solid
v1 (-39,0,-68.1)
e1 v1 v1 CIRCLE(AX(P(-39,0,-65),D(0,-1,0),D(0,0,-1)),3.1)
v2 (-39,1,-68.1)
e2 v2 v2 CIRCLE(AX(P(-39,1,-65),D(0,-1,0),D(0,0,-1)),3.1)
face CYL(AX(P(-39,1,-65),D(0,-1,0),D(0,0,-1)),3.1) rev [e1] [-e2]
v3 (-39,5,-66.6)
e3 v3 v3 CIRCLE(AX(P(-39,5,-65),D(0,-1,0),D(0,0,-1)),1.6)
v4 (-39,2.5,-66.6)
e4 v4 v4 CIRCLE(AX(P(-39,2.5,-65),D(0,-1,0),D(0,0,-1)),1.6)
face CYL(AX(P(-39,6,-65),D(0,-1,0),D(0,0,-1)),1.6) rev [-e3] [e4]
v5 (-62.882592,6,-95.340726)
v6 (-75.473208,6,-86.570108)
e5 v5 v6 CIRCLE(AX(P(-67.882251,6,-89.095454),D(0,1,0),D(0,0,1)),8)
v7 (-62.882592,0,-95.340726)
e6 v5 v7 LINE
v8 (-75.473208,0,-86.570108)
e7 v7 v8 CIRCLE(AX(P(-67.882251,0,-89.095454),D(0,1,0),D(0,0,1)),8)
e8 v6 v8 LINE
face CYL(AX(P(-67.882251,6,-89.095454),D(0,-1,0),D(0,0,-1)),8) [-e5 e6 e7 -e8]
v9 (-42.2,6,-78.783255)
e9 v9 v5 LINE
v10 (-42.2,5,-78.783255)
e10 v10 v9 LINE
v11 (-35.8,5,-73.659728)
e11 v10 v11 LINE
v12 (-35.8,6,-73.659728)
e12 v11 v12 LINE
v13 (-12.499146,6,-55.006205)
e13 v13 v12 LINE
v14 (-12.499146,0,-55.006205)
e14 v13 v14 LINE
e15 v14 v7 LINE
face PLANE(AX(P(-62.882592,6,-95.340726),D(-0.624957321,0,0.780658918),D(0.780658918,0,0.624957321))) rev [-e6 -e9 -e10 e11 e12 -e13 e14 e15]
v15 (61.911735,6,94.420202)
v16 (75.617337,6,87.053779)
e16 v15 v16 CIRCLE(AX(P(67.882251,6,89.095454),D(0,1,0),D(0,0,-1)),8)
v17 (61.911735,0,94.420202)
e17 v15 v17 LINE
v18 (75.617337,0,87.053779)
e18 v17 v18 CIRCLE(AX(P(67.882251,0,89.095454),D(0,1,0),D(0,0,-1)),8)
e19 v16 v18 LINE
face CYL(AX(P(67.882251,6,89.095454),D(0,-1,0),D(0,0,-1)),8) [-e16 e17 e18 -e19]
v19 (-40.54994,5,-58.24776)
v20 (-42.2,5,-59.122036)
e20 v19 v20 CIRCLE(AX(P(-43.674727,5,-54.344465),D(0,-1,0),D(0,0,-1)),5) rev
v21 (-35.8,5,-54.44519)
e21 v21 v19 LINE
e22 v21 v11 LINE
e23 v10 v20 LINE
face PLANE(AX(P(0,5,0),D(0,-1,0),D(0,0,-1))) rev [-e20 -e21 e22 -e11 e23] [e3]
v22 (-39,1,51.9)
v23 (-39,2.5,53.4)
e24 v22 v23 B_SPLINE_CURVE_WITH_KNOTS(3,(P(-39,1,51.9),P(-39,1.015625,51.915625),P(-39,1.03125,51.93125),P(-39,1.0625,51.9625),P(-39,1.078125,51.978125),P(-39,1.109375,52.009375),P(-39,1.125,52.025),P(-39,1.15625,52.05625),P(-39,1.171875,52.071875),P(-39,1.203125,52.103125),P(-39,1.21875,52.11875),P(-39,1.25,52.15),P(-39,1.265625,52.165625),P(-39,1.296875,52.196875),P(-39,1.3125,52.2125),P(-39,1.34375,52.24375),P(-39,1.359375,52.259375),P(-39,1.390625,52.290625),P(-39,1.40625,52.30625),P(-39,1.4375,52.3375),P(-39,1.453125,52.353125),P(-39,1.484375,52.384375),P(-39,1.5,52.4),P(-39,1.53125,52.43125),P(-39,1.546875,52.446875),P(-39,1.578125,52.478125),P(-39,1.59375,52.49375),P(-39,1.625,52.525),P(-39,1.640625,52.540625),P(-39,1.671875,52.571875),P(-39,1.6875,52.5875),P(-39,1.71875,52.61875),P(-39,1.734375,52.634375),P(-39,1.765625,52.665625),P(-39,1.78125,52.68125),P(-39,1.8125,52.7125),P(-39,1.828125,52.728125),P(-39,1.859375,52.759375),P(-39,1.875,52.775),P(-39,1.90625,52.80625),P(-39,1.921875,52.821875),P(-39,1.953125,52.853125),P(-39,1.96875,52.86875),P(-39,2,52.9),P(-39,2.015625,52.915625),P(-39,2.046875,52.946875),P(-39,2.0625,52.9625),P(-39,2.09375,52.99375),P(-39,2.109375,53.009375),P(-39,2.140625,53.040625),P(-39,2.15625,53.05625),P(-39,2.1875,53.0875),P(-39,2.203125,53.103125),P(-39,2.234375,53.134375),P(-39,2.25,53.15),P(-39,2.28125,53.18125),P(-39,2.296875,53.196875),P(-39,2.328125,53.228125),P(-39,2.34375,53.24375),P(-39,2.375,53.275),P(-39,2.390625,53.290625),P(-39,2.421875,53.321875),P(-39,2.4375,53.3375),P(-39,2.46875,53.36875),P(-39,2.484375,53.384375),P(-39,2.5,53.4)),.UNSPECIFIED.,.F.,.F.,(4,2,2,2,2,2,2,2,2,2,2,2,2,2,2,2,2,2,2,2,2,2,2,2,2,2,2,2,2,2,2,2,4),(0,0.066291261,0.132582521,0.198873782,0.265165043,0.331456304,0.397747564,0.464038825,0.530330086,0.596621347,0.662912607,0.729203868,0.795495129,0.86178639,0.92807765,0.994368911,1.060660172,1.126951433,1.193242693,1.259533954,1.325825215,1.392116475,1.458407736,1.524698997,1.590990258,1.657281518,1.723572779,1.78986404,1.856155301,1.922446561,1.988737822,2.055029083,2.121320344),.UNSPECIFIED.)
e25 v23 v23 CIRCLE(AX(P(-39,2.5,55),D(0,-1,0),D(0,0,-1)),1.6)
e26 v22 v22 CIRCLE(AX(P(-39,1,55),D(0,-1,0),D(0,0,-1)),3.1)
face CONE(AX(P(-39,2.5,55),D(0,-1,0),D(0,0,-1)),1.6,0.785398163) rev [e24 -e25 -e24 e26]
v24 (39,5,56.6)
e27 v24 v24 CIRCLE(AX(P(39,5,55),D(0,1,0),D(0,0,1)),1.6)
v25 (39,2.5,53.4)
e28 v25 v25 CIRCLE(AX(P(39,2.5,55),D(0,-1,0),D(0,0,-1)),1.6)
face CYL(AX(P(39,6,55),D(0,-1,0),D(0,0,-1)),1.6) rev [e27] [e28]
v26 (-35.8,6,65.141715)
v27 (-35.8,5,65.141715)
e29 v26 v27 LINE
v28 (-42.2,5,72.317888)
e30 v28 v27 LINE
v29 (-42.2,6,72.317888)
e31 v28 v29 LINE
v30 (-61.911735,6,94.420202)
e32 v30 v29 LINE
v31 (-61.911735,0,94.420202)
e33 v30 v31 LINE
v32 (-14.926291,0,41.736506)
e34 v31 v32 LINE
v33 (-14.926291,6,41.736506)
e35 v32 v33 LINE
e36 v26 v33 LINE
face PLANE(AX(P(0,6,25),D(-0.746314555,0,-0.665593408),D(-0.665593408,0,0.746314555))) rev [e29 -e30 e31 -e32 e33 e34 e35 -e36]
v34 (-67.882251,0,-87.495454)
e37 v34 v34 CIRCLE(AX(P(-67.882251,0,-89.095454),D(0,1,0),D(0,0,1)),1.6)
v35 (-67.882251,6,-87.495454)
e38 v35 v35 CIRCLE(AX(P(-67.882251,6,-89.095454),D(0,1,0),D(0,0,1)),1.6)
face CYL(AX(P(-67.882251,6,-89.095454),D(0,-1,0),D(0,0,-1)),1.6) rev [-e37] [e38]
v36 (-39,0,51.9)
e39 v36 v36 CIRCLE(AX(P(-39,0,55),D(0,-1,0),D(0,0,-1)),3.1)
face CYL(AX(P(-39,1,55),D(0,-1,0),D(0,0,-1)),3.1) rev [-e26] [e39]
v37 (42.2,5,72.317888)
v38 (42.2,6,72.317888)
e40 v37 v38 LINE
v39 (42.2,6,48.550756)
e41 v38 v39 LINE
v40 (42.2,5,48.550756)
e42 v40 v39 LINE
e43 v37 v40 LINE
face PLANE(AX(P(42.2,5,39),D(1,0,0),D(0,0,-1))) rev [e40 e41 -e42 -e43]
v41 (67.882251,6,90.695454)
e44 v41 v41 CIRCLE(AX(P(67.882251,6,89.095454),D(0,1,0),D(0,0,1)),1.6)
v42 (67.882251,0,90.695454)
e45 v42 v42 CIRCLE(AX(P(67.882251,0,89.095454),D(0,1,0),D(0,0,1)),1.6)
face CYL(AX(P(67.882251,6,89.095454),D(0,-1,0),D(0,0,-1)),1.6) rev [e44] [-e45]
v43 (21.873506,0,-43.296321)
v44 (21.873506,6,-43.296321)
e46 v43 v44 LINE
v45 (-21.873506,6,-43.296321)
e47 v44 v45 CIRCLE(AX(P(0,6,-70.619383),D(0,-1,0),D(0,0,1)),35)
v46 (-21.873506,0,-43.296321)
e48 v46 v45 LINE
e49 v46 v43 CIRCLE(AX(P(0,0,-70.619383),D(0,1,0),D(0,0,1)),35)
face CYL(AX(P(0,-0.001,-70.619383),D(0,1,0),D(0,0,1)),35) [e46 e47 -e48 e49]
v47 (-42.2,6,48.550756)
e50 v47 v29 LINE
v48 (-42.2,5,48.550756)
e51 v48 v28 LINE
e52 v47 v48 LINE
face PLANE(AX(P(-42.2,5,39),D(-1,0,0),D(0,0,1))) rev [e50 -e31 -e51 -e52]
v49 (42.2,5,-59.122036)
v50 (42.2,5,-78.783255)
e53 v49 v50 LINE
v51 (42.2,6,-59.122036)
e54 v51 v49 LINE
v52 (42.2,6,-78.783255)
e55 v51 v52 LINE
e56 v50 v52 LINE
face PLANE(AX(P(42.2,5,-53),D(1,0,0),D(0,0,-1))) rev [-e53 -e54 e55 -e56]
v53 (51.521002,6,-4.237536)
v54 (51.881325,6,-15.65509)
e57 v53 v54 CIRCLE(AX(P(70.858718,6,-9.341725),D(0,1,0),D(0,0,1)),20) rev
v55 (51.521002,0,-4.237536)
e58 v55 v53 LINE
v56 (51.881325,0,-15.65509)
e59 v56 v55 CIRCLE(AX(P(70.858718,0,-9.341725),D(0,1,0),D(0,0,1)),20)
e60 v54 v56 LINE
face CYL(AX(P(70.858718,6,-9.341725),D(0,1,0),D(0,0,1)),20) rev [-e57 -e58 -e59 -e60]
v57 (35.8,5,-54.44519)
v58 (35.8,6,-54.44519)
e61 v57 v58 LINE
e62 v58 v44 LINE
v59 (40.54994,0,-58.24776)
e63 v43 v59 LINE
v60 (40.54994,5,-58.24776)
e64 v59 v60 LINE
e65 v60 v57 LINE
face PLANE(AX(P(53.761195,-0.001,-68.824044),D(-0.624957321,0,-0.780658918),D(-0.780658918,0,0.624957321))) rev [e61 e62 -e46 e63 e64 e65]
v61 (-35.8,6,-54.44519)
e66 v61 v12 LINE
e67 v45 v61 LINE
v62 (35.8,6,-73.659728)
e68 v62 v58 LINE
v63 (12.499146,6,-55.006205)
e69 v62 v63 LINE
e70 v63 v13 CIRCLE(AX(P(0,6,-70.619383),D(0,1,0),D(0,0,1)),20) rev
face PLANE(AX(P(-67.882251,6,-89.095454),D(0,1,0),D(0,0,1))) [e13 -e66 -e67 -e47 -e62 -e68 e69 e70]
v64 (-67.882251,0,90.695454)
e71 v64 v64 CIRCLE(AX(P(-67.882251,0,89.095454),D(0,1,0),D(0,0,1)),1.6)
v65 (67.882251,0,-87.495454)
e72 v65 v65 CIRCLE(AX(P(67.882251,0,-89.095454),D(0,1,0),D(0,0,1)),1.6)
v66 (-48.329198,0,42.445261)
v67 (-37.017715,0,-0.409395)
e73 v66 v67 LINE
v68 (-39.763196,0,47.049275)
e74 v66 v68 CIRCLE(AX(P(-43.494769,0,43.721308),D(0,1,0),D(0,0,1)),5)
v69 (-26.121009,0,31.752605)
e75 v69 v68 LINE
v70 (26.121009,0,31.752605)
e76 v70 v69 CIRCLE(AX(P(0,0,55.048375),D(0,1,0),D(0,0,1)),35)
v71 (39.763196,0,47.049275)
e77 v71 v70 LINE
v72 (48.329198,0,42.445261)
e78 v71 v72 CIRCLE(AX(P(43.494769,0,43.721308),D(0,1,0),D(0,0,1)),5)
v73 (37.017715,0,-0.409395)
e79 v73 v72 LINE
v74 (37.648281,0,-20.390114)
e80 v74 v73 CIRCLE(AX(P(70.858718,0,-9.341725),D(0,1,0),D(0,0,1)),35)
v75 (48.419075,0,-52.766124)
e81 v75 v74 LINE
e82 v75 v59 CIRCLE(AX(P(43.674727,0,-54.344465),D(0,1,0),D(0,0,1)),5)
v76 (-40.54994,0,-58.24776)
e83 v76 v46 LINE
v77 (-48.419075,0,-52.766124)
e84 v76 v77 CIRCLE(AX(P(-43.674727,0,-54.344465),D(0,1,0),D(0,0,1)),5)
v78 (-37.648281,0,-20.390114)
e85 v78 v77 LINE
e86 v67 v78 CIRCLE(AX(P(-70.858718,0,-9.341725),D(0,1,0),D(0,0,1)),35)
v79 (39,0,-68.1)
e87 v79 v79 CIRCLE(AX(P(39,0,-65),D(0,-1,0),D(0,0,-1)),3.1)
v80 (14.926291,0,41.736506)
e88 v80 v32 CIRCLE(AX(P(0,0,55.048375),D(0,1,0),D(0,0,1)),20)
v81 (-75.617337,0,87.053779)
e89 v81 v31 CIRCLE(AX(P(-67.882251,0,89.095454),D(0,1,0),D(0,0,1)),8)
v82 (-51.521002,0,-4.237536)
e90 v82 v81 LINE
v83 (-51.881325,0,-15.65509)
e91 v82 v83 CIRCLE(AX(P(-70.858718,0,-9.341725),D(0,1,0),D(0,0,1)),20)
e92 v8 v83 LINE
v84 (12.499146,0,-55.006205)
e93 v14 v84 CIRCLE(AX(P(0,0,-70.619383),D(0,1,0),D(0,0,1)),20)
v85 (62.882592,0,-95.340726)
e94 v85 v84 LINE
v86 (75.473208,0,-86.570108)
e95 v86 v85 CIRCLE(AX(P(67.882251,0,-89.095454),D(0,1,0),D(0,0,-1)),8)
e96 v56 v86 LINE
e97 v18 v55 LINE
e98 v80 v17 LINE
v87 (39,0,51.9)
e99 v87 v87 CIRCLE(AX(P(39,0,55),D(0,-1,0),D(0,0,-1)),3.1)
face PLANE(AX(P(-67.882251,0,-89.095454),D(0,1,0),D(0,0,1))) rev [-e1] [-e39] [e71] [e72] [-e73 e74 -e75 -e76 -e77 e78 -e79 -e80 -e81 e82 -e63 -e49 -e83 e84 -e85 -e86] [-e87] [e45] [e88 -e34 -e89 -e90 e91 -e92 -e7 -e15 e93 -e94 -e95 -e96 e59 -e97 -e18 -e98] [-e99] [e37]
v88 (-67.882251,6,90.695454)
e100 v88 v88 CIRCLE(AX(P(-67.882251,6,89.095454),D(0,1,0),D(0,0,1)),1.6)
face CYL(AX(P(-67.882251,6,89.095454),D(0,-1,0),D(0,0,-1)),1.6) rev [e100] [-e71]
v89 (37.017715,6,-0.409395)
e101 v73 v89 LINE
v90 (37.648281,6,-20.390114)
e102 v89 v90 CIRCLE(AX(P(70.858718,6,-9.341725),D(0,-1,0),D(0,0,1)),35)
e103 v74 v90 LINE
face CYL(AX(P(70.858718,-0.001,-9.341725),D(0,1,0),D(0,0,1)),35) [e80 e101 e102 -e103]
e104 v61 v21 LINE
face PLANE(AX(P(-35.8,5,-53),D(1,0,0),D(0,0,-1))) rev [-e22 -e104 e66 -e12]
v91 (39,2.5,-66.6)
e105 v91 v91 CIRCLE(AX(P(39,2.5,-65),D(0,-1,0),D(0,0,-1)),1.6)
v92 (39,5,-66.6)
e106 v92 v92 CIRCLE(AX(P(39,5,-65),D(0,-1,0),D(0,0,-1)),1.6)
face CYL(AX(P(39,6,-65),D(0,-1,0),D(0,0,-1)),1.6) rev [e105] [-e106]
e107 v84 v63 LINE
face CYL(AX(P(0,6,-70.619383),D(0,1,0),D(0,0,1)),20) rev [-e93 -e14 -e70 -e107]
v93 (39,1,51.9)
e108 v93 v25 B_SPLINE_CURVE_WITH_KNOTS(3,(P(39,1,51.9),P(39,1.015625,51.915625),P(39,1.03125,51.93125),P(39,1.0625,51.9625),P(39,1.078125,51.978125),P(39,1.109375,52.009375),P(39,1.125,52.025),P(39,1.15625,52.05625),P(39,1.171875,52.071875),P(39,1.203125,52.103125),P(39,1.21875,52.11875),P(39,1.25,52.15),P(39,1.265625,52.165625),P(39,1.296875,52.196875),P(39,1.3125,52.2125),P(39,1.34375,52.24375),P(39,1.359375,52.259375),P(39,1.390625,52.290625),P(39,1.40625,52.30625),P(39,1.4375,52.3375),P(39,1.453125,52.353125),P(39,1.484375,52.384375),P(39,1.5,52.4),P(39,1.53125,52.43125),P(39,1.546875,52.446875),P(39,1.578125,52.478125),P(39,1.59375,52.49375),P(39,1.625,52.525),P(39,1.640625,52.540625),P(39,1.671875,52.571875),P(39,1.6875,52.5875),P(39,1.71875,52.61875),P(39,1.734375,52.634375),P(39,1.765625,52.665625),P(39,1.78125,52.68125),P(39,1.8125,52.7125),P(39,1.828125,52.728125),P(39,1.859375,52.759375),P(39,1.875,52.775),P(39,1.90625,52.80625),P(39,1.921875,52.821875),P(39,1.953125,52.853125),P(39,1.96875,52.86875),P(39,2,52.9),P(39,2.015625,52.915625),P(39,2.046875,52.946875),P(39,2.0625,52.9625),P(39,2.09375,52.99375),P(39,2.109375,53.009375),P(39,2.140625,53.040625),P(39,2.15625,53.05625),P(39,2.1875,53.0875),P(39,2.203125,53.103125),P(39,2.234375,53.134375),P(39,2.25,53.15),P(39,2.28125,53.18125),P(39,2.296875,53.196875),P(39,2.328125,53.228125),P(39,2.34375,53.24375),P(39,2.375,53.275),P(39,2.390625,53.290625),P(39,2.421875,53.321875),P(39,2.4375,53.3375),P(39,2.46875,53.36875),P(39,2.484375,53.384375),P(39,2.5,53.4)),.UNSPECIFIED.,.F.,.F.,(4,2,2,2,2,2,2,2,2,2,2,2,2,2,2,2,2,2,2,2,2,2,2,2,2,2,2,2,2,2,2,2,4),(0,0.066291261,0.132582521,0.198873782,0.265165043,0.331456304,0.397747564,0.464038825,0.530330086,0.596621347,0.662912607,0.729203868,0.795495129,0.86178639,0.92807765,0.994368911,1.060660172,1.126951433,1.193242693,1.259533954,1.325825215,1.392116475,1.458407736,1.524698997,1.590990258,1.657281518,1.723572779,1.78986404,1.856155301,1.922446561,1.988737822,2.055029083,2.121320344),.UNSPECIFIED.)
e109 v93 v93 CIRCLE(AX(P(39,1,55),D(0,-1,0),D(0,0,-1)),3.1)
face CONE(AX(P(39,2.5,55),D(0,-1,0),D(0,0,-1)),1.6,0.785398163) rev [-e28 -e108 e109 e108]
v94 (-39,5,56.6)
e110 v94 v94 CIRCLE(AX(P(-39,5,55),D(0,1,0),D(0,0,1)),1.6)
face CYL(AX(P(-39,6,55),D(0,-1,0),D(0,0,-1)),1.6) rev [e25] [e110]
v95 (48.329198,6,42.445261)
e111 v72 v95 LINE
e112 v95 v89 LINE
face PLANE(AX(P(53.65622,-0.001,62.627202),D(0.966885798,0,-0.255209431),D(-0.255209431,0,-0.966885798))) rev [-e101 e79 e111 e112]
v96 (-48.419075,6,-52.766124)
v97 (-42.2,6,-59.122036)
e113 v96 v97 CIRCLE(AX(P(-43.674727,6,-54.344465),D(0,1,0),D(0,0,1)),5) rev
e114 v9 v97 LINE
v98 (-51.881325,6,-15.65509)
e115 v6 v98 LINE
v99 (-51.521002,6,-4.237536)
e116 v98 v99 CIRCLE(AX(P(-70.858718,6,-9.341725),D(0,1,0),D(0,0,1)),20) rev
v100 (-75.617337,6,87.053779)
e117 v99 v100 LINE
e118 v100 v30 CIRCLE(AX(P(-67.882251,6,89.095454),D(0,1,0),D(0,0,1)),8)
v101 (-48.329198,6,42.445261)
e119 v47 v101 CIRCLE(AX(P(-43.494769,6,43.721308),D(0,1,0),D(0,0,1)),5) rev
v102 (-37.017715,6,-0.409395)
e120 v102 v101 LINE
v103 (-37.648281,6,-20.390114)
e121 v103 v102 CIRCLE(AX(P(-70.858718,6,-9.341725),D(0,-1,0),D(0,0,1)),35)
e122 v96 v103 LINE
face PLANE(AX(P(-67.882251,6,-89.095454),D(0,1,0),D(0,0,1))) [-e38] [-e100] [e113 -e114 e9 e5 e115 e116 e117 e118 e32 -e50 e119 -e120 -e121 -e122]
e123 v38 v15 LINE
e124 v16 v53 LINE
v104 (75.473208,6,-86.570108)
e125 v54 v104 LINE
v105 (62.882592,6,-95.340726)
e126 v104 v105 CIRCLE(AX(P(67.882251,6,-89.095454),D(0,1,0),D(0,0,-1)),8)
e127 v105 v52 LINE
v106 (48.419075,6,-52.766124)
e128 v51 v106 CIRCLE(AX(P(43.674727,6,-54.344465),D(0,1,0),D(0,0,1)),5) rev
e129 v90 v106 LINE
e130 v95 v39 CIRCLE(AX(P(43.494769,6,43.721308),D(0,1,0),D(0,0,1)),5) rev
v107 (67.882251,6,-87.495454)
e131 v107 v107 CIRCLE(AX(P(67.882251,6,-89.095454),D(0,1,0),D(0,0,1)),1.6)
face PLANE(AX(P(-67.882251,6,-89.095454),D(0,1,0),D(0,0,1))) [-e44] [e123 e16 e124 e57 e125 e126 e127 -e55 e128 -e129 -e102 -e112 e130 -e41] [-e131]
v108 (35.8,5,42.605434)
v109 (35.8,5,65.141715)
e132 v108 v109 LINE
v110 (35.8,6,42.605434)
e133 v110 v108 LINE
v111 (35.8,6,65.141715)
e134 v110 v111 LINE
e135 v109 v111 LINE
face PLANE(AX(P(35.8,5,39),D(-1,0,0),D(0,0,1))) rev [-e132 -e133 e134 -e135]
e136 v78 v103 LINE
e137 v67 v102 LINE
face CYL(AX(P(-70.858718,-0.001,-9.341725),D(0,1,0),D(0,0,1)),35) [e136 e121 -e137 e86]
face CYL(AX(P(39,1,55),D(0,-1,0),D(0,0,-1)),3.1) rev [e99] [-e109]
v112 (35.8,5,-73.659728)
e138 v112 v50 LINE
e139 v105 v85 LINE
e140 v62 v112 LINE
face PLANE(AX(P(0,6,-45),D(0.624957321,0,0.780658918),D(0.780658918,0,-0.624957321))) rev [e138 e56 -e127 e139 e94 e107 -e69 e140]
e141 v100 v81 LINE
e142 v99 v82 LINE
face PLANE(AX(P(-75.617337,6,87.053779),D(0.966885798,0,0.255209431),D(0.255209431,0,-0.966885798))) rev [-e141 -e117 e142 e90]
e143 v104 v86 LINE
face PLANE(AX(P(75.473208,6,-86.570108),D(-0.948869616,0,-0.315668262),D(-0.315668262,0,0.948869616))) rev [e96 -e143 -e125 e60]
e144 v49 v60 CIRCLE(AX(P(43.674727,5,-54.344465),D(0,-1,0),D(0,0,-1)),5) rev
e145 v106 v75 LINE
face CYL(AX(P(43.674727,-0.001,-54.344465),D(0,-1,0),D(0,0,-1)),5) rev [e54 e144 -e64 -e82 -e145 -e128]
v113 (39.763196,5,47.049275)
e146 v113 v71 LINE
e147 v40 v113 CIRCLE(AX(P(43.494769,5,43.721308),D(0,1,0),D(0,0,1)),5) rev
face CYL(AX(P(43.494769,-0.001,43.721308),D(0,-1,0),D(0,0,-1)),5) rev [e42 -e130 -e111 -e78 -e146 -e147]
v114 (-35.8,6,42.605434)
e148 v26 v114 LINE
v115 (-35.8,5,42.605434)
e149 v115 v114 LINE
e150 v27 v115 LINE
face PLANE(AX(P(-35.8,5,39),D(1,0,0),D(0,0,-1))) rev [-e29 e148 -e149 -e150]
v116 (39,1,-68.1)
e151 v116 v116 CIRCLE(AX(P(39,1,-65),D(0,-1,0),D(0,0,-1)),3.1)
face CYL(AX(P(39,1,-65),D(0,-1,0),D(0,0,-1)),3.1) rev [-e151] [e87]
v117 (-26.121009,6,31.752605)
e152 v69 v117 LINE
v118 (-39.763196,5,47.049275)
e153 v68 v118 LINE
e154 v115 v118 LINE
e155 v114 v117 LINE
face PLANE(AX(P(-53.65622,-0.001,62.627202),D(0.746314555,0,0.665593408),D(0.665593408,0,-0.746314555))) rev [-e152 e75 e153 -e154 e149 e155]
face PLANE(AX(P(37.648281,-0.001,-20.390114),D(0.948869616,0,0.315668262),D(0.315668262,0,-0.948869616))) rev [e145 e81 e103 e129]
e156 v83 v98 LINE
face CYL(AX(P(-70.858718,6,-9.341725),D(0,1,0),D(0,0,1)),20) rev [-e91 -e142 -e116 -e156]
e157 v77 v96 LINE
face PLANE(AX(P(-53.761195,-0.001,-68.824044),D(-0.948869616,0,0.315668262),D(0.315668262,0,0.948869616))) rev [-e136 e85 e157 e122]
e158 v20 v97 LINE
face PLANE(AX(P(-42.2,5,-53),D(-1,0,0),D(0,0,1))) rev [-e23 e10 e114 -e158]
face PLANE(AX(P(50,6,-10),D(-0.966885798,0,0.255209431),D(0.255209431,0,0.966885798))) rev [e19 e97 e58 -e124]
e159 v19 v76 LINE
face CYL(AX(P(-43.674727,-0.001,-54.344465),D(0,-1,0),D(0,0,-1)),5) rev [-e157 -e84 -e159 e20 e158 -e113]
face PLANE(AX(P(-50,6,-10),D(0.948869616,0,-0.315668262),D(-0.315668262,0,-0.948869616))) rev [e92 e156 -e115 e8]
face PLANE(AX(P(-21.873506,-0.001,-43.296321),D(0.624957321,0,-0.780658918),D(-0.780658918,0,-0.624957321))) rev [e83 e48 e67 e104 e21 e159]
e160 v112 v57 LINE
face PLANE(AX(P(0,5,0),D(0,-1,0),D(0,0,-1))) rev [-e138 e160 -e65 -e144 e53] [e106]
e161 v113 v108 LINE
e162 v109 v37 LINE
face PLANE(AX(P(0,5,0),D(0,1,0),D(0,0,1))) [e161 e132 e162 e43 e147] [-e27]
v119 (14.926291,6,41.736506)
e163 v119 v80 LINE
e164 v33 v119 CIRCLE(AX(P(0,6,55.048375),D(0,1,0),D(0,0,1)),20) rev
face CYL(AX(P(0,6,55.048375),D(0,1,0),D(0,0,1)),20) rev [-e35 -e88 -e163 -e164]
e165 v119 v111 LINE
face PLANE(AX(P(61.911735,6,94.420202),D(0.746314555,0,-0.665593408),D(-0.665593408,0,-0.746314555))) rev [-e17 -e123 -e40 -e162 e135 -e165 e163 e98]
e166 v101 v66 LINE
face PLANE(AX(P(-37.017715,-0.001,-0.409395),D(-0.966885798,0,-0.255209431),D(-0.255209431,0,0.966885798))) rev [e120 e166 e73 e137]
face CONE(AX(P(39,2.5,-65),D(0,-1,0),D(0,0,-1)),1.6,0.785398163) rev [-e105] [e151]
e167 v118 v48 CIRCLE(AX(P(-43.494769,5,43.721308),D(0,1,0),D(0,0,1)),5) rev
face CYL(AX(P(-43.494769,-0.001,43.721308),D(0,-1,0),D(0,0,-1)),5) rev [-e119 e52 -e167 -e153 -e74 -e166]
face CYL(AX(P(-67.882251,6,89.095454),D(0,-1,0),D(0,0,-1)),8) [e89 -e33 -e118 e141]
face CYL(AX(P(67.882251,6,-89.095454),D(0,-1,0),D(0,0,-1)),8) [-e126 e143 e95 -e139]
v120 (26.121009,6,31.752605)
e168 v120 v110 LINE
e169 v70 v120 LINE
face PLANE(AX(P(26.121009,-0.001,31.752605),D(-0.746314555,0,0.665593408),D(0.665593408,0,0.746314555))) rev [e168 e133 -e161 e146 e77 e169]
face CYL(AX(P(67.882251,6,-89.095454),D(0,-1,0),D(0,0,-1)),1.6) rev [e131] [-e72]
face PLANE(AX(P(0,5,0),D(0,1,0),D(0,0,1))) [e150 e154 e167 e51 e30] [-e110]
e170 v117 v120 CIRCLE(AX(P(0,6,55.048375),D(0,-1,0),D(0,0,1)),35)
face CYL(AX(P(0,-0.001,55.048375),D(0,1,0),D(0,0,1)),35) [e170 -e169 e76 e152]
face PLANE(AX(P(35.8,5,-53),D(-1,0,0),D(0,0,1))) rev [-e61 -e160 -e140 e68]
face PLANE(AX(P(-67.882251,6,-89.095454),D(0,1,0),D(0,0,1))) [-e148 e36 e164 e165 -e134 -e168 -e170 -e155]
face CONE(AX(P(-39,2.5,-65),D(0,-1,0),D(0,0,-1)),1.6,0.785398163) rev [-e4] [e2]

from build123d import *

# Parameters (mm, degrees)
SKETCH1_R           = 1.6
BOSS_EXTRUDE1_DEPTH = 6
FILLET1_R           = 20
CUT_EXTRUDE1_REACH  = 125.376
FILLET4_R           = 5
SKETCH6_W           = 6.4
SKETCH6_H           = 33.317887839
SKETCH6_H_2         = 25.783254567
CUT_EXTRUDE2_DEPTH  = 1
SKETCH7_R           = 3.1
CUT_EXTRUDE3_DEPTH  = 1
CHAMFER1_SIZE       = 1.5


with BuildPart() as part:
    # Sketch1 → Boss-Extrude1 (new body)
    with BuildSketch(Plane(origin=(0, 0, 0), x_dir=(1, 0, 0), z_dir=(0, 1, 0))):
        with BuildLine():
            Line((-62.882592423, 95.340725775), (0, 45))
            Line((0, 45), (62.882592423, 95.340725775))
            ThreePointArc((62.882592423, 95.340725775), (72.454956907, 95.659779271), (75.473207923, 86.570108333))
            Line((75.473207923, 86.570108333), (50, 10))
            Line((50, 10), (75.617337378, -87.053778983))
            ThreePointArc((75.617337378, -87.053778983), (71.66966075, -96.142122248), (61.911734553, -94.420201694))
            Line((61.911734553, -94.420201694), (0, -25))
            Line((0, -25), (-61.911734553, -94.420201694))
            ThreePointArc((-61.911734553, -94.420201694), (-71.66966075, -96.142122248), (-75.617337378, -87.053778983))
            Line((-75.617337378, -87.053778983), (-50, 10))
            Line((-50, 10), (-75.473207923, 86.570108333))
            ThreePointArc((-75.473207923, 86.570108333), (-72.454956907, 95.659779271), (-62.882592423, 95.340725775))
        make_face()
        with Locations(Location((-67.882250994, 89.09545443, 0), (0, 0, 270))):
            Circle(SKETCH1_R, mode=Mode.SUBTRACT)
        with Locations(Location((67.882250994, 89.09545443, 0), (0, 0, 270))):
            Circle(SKETCH1_R, mode=Mode.SUBTRACT)
        with Locations(Location((-67.882250994, -89.09545443, 0), (0, 0, 270))):
            Circle(SKETCH1_R, mode=Mode.SUBTRACT)
        with Locations(Location((67.882250994, -89.09545443, 0), (0, 0, 270))):
            Circle(SKETCH1_R, mode=Mode.SUBTRACT)
        with Locations(Location((-39, 65, 0), (0, 0, 270))):
            Circle(SKETCH1_R, mode=Mode.SUBTRACT)
        with Locations(Location((39, 65, 0), (0, 0, 270))):
            Circle(SKETCH1_R, mode=Mode.SUBTRACT)
        with Locations(Location((39, -55, 0), (0, 0, 270))):
            Circle(SKETCH1_R, mode=Mode.SUBTRACT)
        with Locations(Location((-39, -55, 0), (0, 0, 270))):
            Circle(SKETCH1_R, mode=Mode.SUBTRACT)
    extrude(amount=BOSS_EXTRUDE1_DEPTH)

    # Fillet1
    fillet1_edges = [part.edges().sort_by_distance(p)[0] for p in [
        (0, 3, -45),
        (50, 3, -10),
        (0, 3, 25),
        (-50, 3, -10),
    ]]
    fillet(fillet1_edges, radius=FILLET1_R)

    # Sketch2 → Cut-Extrude1 (cut, up to next)
    with BuildSketch(Plane(origin=(0, 6, 0), x_dir=(1, 0, 0), z_dir=(0, 1, 0)), mode=Mode.PRIVATE) as cut_extrude1_sk1:
        with BuildLine():
            Line((-53.761195119, 68.824044103), (-37.648281191, 20.390114276))
            ThreePointArc((-37.648281191, 20.390114276), (-35.876133945, 10.445731448), (-37.017714824, 0.409395025))
            Line((-37.017714824, 0.409395025), (-53.656219744, -62.627202233))
            Line((-53.656219744, -62.627202233), (-26.12100943, -31.752605236))
            ThreePointArc((-26.12100943, -31.752605236), (0, -20.048374517), (26.12100943, -31.752605236))
            Line((26.12100943, -31.752605236), (53.656219744, -62.627202233))
            Line((53.656219744, -62.627202233), (37.017714824, 0.409395025))
            ThreePointArc((37.017714824, 0.409395025), (35.876133945, 10.445731448), (37.648281191, 20.390114276))
            Line((37.648281191, 20.390114276), (53.761195119, 68.824044103))
            Line((53.761195119, 68.824044103), (21.873506248, 43.296321101))
            ThreePointArc((21.873506248, 43.296321101), (0, 35.619383236), (-21.873506248, 43.296321101))
            Line((-21.873506248, 43.296321101), (-53.761195119, 68.824044103))
        make_face()
    cut_extrude1_tool1 = extrude(cut_extrude1_sk1.sketch, amount=-CUT_EXTRUDE1_REACH, mode=Mode.PRIVATE) & part.part
    add(cut_extrude1_tool1.solids().sort_by_distance((0, 6, -6.295596))[0], mode=Mode.SUBTRACT)

    # Fillet4
    fillet4_edges = [part.edges().sort_by_distance(p)[0] for p in [
        (-53.761195119, 3, -68.824044103),
        (53.761195119, 3, -68.824044103),
        (53.656219744, 3, 62.627202233),
        (-53.656219744, 3, 62.627202233),
    ]]
    fillet(fillet4_edges, radius=FILLET4_R)

    # Sketch6 → Cut-Extrude2 (cut)
    with BuildSketch(Plane(origin=(0, 6, 0), x_dir=(1, 0, 0), z_dir=(0, 1, 0))):
        with Locations((-39, -55.65894392)):
            Rectangle(SKETCH6_W, SKETCH6_H)
        with Locations((39, -55.65894392)):
            Rectangle(SKETCH6_W, SKETCH6_H)
        with Locations((39, 65.891627284)):
            Rectangle(SKETCH6_W, SKETCH6_H_2)
        with Locations((-39, 65.891627284)):
            Rectangle(SKETCH6_W, SKETCH6_H_2)
    extrude(amount=-CUT_EXTRUDE2_DEPTH, mode=Mode.SUBTRACT)

    # Sketch7 → Cut-Extrude3 (cut)
    with BuildSketch(Plane.XZ):
        with Locations(Location((-39, 55, 0), (0, 0, 270))):
            Circle(SKETCH7_R)
        with Locations(Location((39, 55, 0), (0, 0, 270))):
            Circle(SKETCH7_R)
        with Locations(Location((-39, -65, 0), (0, 0, 270))):
            Circle(SKETCH7_R)
        with Locations(Location((39, -65, 0), (0, 0, 270))):
            Circle(SKETCH7_R)
    extrude(amount=-CUT_EXTRUDE3_DEPTH, mode=Mode.SUBTRACT)

    # Chamfer1
    chamfer1_edges = [part.edges().sort_by_distance(p)[0] for p in [
        (-39, 1, 53.4),
        (39, 1, 53.4),
        (-39, 1, -66.6),
        (39, 1, -66.6),
    ]]
    chamfer(chamfer1_edges, length=CHAMFER1_SIZE - 0.0001)  # a hair under: the kernel refuses the full size


solid = part.part
